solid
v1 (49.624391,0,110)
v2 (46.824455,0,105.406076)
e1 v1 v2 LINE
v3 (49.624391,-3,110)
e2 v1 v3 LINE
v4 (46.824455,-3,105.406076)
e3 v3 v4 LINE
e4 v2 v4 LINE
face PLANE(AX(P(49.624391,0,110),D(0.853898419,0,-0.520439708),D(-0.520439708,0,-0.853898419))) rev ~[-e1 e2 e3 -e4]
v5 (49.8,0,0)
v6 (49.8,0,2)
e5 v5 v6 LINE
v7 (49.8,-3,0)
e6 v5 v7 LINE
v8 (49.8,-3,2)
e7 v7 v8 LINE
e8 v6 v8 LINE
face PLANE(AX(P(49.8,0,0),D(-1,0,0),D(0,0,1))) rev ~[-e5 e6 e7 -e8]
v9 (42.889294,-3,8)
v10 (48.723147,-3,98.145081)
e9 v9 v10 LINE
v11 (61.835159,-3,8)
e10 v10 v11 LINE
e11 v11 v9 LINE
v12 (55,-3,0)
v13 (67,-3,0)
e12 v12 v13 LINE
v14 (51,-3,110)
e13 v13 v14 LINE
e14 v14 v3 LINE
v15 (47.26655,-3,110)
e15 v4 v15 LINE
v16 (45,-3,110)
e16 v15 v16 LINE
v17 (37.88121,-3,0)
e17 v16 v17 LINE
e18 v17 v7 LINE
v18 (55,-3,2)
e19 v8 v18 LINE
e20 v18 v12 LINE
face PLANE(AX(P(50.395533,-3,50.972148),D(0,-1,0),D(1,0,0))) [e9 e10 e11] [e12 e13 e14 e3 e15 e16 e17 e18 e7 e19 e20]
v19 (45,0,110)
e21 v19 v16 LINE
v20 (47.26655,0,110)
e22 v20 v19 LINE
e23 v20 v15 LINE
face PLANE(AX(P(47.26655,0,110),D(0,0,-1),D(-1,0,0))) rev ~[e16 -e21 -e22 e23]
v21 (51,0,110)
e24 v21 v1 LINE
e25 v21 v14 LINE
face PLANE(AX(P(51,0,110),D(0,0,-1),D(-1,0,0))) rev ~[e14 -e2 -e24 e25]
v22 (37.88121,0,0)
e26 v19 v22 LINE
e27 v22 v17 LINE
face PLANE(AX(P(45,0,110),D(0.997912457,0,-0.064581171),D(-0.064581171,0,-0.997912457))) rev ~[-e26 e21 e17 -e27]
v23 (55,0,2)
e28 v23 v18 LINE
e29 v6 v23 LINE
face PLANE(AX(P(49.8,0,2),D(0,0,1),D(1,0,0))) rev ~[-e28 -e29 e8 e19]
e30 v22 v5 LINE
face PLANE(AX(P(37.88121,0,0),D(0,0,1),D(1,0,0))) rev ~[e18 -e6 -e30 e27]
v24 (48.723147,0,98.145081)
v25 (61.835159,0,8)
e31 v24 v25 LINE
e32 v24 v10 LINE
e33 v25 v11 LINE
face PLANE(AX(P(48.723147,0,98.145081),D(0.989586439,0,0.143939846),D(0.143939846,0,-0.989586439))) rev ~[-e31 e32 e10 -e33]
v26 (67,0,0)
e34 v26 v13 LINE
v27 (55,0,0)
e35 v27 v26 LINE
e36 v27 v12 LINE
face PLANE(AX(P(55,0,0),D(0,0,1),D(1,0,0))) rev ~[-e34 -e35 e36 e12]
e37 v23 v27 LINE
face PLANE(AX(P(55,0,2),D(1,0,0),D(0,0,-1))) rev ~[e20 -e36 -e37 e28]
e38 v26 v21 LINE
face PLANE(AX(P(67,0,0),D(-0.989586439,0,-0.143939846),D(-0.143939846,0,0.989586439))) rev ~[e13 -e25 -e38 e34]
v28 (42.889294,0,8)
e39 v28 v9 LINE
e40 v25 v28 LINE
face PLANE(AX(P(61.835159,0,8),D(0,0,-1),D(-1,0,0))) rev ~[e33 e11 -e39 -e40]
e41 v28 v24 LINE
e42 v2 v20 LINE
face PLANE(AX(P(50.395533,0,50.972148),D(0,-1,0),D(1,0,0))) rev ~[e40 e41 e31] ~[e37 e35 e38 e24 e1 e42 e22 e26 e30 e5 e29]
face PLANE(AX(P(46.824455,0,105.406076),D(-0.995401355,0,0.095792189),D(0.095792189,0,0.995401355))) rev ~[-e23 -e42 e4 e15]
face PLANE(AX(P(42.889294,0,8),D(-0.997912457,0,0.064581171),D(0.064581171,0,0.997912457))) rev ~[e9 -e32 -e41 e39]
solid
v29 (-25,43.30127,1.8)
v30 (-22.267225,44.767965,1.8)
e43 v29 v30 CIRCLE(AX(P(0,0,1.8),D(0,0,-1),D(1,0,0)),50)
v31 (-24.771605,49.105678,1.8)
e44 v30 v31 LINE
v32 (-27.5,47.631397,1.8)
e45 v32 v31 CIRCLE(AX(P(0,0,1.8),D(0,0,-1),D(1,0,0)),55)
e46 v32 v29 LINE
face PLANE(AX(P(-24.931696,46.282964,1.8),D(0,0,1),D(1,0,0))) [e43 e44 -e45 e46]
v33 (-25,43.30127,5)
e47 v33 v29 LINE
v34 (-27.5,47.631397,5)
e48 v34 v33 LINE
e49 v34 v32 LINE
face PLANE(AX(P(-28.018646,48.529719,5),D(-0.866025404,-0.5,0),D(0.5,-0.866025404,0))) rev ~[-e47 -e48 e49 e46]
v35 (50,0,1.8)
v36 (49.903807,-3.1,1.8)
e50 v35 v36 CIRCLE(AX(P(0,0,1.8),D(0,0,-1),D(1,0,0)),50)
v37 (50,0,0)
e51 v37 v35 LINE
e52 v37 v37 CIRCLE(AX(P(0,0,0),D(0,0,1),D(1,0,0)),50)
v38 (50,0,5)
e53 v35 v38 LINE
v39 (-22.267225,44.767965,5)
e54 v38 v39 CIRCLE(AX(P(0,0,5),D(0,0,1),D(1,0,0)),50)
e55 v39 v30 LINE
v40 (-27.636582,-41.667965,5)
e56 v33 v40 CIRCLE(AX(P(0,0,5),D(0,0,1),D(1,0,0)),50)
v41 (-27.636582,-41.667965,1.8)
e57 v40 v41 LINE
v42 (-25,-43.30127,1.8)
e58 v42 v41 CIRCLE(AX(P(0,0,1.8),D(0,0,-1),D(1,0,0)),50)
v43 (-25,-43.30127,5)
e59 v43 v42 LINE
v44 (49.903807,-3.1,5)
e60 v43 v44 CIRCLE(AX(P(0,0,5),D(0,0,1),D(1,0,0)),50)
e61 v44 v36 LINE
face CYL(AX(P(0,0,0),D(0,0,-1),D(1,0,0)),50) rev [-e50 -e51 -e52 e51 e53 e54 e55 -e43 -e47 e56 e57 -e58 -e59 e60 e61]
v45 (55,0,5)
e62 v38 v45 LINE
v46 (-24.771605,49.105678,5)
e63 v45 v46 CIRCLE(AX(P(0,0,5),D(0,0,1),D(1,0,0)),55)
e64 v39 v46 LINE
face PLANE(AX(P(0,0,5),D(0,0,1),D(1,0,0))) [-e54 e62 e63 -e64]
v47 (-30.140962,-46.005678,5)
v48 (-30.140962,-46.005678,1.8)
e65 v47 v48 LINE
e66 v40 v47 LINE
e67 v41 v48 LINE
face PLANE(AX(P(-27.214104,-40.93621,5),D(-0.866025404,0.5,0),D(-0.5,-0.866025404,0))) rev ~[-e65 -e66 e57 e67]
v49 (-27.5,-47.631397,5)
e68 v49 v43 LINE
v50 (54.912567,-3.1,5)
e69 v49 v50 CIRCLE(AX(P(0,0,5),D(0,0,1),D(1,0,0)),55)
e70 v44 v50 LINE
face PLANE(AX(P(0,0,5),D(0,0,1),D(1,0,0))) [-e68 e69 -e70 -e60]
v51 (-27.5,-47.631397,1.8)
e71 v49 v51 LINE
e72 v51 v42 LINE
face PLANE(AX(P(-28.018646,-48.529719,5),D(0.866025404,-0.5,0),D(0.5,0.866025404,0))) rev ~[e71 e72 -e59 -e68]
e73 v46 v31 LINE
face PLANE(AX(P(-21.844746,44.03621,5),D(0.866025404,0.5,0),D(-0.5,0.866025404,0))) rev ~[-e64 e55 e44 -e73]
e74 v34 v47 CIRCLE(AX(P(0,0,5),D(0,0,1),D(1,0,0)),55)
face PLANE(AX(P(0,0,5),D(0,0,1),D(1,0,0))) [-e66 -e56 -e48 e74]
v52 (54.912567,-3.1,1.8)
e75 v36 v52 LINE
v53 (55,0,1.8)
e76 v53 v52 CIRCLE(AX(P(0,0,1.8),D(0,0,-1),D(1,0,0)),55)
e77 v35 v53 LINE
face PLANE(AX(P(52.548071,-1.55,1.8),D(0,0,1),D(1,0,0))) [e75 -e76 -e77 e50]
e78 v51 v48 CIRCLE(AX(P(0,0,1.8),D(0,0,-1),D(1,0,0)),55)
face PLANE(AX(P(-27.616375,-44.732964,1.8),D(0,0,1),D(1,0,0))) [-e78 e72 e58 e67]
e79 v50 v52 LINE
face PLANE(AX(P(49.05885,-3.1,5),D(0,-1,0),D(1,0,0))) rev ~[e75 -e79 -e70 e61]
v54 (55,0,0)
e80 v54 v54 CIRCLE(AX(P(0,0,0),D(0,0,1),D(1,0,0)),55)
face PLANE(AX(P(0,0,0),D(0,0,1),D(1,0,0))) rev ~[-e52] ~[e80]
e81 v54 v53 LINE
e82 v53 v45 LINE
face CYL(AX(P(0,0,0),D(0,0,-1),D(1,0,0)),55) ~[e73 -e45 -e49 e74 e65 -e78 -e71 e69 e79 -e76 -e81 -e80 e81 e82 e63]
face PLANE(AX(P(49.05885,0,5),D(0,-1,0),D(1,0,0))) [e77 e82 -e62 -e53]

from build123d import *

# Parameters (mm, degrees)
F5_DEPTH = 3
F6_R     = 55
F6_R_2   = 50
F7_DEPTH = 5
F8_W     = 6.9784420547
F8_H     = 3.1
F9_DEPTH = 3.2


with BuildPart() as f5:
    # F4 (on Front) → F5 (new body)
    with BuildSketch(Plane.XZ):
        Polygon((47.2665503621, 110), (45, 110), (37.8812104464, 0), (49.8, 0), (49.8, 2), (55, 2), (55, 0), (67, 0), (51, 110), (49.6243909001, 110), (46.8244552612, 105.406075716), align=None)
        Polygon((61.8351592405, 8), (42.8892941961, 8), (48.7231474716, 98.1450809113), align=None, mode=Mode.SUBTRACT)
    extrude(amount=F5_DEPTH)


with BuildPart() as f7:
    # F6 (on Top) → F7 (new body)
    with BuildSketch(Plane.XY):
        Circle(F6_R)
        Circle(F6_R_2, mode=Mode.SUBTRACT)
    extrude(amount=F7_DEPTH)

    # F8 (on face) → F9 (cut)
    with BuildSketch(Plane.XY.offset(5)):
        with Locations((52.5480711023, -1.55)):
            Rectangle(F8_W, F8_H)
        Polygon((-28.0186460648, 48.5297185436), (-24.5294250375, 42.4862104453), (-21.8447462857, 44.0362104453), (-25.3339673131, 50.0797185436), align=None)
        Polygon((-28.0186460648, -48.5297185436), (-24.5294250375, -42.4862104453), (-27.2141037892, -40.9362104453), (-30.7033248166, -46.9797185436), align=None)
    extrude(amount=-F9_DEPTH, mode=Mode.SUBTRACT)


solid = Compound([f5.part, f7.part])
